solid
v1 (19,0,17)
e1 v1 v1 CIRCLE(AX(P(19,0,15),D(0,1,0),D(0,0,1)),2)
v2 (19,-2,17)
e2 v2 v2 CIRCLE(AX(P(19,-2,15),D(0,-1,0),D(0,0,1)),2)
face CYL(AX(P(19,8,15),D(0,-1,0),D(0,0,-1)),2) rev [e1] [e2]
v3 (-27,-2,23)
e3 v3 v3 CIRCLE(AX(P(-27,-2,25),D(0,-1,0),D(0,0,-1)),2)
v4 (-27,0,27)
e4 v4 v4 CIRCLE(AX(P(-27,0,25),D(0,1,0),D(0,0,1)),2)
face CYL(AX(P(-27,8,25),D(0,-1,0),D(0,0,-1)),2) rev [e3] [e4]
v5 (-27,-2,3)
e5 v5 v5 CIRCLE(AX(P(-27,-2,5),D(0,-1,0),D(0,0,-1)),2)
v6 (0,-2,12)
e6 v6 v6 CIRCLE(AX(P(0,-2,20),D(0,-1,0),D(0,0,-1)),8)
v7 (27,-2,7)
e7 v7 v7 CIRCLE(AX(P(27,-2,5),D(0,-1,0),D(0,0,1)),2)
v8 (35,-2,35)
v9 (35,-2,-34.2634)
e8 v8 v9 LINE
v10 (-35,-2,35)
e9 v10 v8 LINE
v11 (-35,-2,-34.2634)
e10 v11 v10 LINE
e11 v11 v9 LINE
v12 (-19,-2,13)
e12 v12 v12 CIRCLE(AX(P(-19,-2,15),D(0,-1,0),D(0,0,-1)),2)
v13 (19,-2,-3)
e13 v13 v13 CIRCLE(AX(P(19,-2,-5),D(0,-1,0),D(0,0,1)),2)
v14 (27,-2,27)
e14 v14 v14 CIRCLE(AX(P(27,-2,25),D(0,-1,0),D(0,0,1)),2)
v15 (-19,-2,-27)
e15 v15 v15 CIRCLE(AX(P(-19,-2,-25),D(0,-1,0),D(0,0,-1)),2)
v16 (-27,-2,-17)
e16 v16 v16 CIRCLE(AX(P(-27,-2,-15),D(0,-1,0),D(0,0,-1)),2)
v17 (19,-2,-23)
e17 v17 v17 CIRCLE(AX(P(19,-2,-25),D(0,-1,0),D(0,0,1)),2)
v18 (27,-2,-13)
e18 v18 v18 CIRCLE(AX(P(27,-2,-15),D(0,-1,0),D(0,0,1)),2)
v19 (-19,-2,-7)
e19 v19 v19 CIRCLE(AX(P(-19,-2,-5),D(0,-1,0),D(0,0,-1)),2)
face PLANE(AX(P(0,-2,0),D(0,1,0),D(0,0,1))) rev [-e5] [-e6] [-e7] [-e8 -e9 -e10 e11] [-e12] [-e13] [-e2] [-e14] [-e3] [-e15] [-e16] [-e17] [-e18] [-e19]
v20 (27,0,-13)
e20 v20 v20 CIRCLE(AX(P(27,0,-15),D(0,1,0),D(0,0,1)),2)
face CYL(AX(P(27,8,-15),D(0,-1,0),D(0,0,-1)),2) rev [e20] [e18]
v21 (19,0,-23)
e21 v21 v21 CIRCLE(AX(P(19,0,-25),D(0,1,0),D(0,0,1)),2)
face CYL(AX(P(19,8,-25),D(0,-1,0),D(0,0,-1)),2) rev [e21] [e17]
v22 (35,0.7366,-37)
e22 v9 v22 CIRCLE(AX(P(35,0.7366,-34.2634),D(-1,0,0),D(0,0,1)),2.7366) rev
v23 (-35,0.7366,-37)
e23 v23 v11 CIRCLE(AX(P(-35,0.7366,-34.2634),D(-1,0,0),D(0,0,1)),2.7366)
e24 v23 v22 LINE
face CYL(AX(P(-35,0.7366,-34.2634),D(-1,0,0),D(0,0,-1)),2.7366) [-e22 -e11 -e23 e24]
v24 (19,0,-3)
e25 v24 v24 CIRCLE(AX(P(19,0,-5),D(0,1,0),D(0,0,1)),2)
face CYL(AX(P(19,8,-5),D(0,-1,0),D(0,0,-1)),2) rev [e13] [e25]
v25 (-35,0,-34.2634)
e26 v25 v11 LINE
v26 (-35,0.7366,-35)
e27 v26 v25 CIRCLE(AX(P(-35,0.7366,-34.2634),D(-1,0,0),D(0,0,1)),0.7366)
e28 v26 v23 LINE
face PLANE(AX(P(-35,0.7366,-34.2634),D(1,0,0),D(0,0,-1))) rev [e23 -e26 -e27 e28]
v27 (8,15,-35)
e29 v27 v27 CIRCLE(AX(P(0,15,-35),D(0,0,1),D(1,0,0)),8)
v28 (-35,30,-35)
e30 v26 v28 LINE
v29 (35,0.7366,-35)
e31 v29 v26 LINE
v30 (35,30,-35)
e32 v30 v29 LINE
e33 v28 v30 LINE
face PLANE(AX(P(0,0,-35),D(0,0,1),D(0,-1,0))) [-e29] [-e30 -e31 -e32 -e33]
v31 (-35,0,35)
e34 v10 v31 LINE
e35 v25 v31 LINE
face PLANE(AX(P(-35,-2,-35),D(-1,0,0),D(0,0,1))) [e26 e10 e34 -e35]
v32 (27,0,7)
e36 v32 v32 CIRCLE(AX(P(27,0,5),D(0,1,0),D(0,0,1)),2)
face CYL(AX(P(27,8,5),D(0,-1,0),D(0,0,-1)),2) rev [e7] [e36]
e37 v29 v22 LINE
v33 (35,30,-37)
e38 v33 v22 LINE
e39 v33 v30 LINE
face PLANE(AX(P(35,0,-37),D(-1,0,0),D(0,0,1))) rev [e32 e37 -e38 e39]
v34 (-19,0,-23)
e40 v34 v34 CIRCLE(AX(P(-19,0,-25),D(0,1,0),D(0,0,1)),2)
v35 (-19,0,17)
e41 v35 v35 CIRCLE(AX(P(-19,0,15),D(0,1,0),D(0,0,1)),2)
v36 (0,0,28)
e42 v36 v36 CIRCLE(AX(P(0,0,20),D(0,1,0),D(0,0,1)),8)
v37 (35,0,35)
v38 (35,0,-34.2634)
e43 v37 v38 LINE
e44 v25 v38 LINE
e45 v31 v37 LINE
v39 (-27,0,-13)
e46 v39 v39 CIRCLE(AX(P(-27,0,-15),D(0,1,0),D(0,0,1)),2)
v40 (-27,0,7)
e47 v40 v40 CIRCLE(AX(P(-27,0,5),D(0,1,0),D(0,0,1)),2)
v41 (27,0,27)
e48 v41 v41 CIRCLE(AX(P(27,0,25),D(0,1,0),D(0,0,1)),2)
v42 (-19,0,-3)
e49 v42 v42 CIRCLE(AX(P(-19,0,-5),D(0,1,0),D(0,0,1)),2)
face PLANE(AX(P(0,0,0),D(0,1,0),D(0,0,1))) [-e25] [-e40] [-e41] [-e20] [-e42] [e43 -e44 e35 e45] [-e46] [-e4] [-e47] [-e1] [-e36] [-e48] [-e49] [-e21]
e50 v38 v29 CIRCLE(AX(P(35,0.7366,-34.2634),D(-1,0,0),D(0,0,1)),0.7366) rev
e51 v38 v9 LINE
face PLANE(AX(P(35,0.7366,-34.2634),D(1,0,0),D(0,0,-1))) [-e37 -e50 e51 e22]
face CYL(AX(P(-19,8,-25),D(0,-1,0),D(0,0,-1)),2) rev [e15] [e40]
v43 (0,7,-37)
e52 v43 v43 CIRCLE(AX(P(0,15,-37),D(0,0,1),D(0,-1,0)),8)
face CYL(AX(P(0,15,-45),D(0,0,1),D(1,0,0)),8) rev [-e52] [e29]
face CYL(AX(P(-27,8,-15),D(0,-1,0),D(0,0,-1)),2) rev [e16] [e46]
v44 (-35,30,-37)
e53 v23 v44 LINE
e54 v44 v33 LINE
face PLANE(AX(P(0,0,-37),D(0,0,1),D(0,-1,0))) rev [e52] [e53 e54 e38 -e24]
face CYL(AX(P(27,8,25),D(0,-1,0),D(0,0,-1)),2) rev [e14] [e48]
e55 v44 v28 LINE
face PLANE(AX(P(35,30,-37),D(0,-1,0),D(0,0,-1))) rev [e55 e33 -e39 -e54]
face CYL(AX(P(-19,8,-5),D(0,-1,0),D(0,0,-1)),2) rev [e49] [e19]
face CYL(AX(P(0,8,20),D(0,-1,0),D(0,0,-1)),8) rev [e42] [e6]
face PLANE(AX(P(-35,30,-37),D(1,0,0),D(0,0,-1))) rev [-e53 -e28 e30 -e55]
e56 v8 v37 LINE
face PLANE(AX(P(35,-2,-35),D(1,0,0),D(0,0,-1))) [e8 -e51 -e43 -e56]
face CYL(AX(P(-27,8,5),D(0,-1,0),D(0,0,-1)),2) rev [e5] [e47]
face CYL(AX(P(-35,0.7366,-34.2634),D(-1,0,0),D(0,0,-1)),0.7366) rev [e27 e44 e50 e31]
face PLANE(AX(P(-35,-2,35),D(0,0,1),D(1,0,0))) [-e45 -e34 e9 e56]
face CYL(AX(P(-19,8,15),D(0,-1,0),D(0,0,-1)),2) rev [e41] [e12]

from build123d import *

# Parameters (mm, degrees)
SKETCH1_W                    = 70
SKETCH1_H                    = 70
BASE_FLANGE1_DEPTH           = 2
EDGE_FLANGE1_STRIP_W         = 9.4732
EDGE_FLANGE1_STRIP_H         = 2
EDGE_FLANGE1_STRIP_CUT_DEPTH = 70
EDGE_FLANGE1_DEPTH           = 70
SKETCH9_R                    = 8
CUT_EXTRUDE1_DEPTH           = 10
SKETCH11_R                   = 8
SKETCH11_R_2                 = 2
CUT_EXTRUDE2_DEPTH           = 10


# Sheet-metal steps are written as plain solids
with BuildPart() as part:
    # Sketch1 → Base-Flange1 (new body)
    with BuildSketch(Plane(origin=(0, 0, 0), x_dir=(1, 0, 0), z_dir=(0, 1, 0))):
        Rectangle(SKETCH1_W, SKETCH1_H)
    extrude(amount=-BASE_FLANGE1_DEPTH)

    # Edge-Flange1 strip (across the edge) → Edge-Flange1 strip cut (cut)
    with BuildSketch(Plane(origin=(35, 0, -35), x_dir=(0, 0, 1), z_dir=(-1, 0, 0))):
        with Locations((-4, -1)):
            Rectangle(EDGE_FLANGE1_STRIP_W, EDGE_FLANGE1_STRIP_H)
    extrude(amount=EDGE_FLANGE1_STRIP_CUT_DEPTH, mode=Mode.SUBTRACT)

    # Edge-Flange1 section (across the edge) → Edge-Flange1 (add)
    with BuildSketch(Plane(origin=(35, 0, -35), x_dir=(0, 0, 1), z_dir=(-1, 0, 0))):
        with BuildLine():
            Line((-2, 0.7366), (-2, 30))
            Line((-2, 30), (0, 30))
            Line((0, 30), (0, 0.7366))
            ThreePointArc((0, 0.7366), (0.215745145, 0.215745145), (0.7366, 0))
            Line((0.7366, 0), (0.7366, -2))
            ThreePointArc((0.7366, -2), (-1.198468417, -1.198468417), (-2, 0.7366))
        make_face()
    extrude(amount=EDGE_FLANGE1_DEPTH)

    # Sketch9 → Cut-Extrude1 (cut)
    with BuildSketch(Plane.XY.offset(-35)):
        with Locations((0, 15)):
            Circle(SKETCH9_R)
    extrude(amount=-CUT_EXTRUDE1_DEPTH, mode=Mode.SUBTRACT)

    # Sketch11 → Cut-Extrude2 (cut)
    with BuildSketch(Plane.XZ.offset(2)):
        with Locations(Location((0, 20, 0), (0, 0, 270))):
            Circle(SKETCH11_R)
        with Locations(Location((-27, 25, 0), (0, 0, 270))):
            Circle(SKETCH11_R_2)
        with Locations(Location((-19, 15, 0), (0, 0, 270))):
            Circle(SKETCH11_R_2)
        with Locations(Location((-27, 5, 0), (0, 0, 270))):
            Circle(SKETCH11_R_2)
        with Locations(Location((-19, -5, 0), (0, 0, 270))):
            Circle(SKETCH11_R_2)
        with Locations(Location((-27, -15, 0), (0, 0, 270))):
            Circle(SKETCH11_R_2)
        with Locations(Location((-19, -25, 0), (0, 0, 270))):
            Circle(SKETCH11_R_2)
        with Locations(Location((27, 5, 0), (0, 0, 90))):
            Circle(SKETCH11_R_2)
        with Locations(Location((19, 15, 0), (0, 0, 90))):
            Circle(SKETCH11_R_2)
        with Locations(Location((19, -25, 0), (0, 0, 90))):
            Circle(SKETCH11_R_2)
        with Locations(Location((27, -15, 0), (0, 0, 90))):
            Circle(SKETCH11_R_2)
        with Locations(Location((19, -5, 0), (0, 0, 90))):
            Circle(SKETCH11_R_2)
        with Locations(Location((27, 25, 0), (0, 0, 90))):
            Circle(SKETCH11_R_2)
    extrude(amount=-CUT_EXTRUDE2_DEPTH, mode=Mode.SUBTRACT)


solid = part.part
